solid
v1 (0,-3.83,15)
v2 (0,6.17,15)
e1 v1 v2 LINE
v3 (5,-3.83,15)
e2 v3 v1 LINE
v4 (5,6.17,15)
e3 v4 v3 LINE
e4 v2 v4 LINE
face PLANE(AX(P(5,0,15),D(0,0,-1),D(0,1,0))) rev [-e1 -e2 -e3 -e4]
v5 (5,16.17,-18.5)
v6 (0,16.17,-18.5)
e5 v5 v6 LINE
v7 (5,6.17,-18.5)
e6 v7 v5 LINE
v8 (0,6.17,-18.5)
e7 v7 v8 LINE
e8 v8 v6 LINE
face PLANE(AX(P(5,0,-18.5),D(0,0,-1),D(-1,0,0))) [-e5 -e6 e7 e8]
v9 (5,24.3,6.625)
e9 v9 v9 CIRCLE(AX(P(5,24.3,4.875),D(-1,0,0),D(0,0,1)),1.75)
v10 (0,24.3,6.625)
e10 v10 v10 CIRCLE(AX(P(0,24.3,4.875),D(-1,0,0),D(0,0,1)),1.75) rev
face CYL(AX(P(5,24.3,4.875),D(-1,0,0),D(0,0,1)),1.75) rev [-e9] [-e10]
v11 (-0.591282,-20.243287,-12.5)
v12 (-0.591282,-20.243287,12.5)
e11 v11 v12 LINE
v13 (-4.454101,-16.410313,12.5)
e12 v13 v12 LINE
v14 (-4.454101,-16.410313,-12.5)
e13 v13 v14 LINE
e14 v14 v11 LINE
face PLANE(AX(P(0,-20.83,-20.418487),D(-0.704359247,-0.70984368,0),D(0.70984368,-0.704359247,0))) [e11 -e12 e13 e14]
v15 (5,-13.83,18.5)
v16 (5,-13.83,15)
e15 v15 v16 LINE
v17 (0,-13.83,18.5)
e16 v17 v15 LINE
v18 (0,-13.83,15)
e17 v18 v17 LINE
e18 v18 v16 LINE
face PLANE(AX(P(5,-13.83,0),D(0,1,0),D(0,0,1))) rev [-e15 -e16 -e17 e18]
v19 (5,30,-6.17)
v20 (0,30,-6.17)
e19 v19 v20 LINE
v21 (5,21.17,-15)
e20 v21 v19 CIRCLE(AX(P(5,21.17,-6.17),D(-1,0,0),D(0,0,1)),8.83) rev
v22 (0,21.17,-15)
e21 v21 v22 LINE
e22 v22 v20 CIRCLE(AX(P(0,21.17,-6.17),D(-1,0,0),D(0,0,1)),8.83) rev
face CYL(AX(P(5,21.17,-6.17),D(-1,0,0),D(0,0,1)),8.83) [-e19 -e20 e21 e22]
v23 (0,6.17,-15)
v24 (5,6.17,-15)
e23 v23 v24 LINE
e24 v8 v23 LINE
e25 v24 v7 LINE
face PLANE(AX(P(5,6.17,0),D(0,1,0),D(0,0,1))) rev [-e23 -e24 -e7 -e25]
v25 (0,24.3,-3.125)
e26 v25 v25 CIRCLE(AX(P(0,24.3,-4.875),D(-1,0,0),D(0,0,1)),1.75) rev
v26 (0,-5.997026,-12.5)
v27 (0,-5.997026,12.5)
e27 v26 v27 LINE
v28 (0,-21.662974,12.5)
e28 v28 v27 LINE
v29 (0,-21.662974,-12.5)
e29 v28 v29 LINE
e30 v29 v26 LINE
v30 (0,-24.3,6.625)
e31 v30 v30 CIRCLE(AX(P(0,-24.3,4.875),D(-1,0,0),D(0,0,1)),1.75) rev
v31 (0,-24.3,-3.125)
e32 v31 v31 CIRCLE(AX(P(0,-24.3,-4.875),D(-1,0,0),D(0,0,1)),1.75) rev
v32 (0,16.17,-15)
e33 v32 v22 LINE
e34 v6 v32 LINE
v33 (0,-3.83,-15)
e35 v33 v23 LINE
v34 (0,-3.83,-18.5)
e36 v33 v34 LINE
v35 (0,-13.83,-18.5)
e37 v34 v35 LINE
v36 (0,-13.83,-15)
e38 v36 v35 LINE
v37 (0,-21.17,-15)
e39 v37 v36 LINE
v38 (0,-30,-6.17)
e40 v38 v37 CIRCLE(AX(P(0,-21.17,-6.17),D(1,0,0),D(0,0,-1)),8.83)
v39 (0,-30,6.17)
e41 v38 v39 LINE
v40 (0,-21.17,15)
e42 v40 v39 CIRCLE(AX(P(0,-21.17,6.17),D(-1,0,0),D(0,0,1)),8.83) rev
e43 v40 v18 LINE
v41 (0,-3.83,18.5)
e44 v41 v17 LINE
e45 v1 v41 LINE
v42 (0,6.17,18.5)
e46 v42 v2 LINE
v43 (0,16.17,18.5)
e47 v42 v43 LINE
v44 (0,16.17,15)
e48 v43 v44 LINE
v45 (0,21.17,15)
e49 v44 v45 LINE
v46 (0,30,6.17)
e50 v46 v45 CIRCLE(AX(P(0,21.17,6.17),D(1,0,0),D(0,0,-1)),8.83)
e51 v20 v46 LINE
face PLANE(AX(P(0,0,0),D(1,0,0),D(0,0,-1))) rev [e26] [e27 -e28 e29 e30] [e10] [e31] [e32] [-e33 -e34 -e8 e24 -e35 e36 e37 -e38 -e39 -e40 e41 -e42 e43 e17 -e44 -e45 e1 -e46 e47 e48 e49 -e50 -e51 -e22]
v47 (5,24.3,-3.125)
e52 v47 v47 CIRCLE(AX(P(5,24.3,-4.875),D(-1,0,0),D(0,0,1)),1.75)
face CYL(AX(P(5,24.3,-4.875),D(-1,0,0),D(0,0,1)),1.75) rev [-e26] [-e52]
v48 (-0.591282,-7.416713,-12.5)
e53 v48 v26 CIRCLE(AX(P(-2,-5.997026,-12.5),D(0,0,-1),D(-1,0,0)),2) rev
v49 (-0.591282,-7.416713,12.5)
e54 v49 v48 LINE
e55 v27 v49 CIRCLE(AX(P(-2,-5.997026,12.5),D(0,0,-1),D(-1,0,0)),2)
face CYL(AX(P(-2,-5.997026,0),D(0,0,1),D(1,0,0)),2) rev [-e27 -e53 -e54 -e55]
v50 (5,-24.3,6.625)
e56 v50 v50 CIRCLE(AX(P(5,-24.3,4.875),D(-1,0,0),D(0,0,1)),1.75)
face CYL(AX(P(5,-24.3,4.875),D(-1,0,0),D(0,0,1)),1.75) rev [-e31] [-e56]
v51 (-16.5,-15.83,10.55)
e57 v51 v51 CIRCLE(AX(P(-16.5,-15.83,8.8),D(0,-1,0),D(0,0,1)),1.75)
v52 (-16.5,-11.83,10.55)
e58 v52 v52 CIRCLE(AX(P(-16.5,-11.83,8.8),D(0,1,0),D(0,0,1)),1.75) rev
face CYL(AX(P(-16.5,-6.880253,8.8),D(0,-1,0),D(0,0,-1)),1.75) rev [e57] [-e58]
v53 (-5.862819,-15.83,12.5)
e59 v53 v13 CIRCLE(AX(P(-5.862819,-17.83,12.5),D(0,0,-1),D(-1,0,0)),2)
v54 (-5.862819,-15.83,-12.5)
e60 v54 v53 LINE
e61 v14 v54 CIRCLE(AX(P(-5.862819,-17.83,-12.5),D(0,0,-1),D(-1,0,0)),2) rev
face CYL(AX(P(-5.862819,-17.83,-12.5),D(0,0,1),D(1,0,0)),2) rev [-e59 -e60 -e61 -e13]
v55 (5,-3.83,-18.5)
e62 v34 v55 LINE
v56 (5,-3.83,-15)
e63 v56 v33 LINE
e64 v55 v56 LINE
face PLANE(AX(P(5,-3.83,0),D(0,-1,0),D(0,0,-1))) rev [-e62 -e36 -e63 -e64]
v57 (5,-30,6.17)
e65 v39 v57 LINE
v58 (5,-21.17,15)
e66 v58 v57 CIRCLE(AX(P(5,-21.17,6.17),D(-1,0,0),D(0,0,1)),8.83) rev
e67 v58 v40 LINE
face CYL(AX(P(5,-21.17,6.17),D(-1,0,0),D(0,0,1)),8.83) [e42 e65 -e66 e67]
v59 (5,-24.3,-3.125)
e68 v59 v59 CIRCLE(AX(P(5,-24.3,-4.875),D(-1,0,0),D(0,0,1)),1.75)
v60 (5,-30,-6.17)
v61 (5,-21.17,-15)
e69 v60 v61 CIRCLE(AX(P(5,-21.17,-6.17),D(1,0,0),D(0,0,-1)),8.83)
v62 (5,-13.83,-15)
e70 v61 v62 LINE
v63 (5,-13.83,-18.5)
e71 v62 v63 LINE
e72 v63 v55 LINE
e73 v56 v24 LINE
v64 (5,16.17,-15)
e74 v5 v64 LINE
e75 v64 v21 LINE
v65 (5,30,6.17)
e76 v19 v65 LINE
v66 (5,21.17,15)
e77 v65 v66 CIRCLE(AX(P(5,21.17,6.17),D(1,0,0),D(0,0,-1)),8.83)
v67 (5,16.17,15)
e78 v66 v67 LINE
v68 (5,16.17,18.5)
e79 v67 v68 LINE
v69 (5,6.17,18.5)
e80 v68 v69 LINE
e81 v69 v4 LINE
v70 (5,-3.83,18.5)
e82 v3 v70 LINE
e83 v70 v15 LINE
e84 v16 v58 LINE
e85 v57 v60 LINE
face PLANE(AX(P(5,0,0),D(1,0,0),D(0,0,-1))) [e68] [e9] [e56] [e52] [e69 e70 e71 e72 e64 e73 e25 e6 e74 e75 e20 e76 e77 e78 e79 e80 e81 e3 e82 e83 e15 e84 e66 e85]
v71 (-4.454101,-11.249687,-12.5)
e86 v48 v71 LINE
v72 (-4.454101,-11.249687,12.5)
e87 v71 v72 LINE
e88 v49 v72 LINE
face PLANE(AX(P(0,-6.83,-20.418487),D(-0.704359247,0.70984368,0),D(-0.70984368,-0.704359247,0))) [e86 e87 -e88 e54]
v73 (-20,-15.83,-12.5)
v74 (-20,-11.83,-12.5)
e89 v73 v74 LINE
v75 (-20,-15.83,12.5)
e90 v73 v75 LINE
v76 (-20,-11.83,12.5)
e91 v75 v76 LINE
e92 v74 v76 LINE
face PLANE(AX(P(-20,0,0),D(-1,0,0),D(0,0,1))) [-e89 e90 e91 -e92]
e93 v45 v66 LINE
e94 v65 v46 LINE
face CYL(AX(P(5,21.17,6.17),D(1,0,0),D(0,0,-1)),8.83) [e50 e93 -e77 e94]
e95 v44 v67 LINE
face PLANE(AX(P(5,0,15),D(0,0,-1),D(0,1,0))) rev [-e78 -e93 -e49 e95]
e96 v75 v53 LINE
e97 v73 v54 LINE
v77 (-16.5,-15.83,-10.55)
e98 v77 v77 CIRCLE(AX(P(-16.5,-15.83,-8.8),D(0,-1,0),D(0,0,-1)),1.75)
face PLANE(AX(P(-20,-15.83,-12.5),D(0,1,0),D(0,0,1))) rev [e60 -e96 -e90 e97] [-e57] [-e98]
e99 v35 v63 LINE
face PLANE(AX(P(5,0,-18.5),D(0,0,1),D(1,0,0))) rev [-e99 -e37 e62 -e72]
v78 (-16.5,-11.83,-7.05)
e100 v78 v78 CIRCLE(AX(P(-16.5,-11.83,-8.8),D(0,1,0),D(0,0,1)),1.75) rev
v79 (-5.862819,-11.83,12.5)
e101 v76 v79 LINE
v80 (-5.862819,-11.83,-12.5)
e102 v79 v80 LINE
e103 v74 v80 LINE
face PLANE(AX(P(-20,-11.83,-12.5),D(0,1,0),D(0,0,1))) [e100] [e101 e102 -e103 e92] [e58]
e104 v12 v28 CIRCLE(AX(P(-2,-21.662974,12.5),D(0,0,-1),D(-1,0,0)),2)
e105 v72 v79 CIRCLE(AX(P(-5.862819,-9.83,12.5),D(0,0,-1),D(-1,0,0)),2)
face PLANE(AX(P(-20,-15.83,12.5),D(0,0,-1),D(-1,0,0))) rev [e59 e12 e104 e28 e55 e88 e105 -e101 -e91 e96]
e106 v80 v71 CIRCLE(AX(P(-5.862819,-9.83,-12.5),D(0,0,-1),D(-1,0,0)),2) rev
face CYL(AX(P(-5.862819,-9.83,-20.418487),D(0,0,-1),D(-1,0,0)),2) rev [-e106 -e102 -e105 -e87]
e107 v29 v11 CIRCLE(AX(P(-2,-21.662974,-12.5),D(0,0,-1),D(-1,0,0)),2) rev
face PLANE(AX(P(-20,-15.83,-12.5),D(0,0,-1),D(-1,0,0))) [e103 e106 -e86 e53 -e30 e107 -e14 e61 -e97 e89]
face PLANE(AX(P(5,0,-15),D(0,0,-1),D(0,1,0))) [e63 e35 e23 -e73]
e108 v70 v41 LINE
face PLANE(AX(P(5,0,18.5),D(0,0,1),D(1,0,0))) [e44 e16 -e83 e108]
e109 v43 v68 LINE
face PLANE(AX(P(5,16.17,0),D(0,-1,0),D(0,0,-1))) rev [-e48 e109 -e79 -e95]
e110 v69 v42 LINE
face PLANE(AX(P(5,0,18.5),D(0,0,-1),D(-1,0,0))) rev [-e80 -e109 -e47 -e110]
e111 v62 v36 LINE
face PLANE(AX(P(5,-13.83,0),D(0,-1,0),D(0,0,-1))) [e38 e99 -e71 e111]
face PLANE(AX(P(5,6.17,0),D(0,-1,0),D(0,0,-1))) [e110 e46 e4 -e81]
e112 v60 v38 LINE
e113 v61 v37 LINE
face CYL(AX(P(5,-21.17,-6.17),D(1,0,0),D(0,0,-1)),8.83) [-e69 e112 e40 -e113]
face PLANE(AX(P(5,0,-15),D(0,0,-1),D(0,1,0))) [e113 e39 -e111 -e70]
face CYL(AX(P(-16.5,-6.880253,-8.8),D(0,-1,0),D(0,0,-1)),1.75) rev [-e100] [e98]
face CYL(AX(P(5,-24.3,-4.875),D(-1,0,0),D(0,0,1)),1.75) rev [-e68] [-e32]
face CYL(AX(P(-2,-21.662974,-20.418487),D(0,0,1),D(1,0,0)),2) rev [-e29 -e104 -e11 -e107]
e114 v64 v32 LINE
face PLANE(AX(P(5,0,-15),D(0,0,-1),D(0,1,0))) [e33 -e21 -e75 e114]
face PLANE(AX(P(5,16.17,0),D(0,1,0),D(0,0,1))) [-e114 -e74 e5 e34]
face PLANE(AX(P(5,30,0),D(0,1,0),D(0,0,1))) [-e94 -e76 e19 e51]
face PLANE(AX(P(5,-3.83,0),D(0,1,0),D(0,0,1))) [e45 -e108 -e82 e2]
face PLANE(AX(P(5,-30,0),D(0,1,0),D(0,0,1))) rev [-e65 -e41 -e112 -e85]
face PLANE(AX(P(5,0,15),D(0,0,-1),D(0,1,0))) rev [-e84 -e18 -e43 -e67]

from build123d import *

# Parameters (mm, degrees)
BOSS_EXTRUDE1_START     = -5
BOSS_EXTRUDE1_OUTLINE_R = 1.75
BOSS_EXTRUDE1_DEPTH     = 5
SKETCH3_W               = 25
SKETCH3_H               = 4
BOSS_EXTRUDE2_DEPTH     = 20
SKETCH4_R               = 1.75
CUT_EXTRUDE1_DEPTH      = 4
BOSS_EXTRUDE3_DEPTH     = 25
FILLET2_R               = 2


with BuildPart() as part:
    # Boss-Extrude1: read off the stored shape, not the designer's step
    # Boss-Extrude1 outline → Boss-Extrude1 (new body)
    with BuildSketch(Plane(origin=(5, 0, 0), x_dir=(0, 0, -1), z_dir=(1, 0, 0)).offset(BOSS_EXTRUDE1_START)):
        with BuildLine():
            Line((-6.17, -30), (6.17, -30))
            ThreePointArc((6.17, -30), (12.413752878, -27.413752878), (15, -21.17))
            Line((15, -21.17), (15, -13.83))
            Line((15, -13.83), (18.5, -13.83))
            Line((18.5, -13.83), (18.5, -3.83))
            Line((18.5, -3.83), (15, -3.83))
            Line((15, -3.83), (15, 6.17))
            Line((15, 6.17), (18.5, 6.17))
            Line((18.5, 6.17), (18.5, 16.17))
            Line((18.5, 16.17), (15, 16.17))
            Line((15, 16.17), (15, 21.17))
            ThreePointArc((15, 21.17), (12.413752878, 27.413752878), (6.17, 30))
            Line((6.17, 30), (-6.17, 30))
            ThreePointArc((-6.17, 30), (-12.413752878, 27.413752878), (-15, 21.17))
            Line((-15, 21.17), (-15, 16.17))
            Line((-15, 16.17), (-18.5, 16.17))
            Line((-18.5, 16.17), (-18.5, 6.17))
            Line((-18.5, 6.17), (-15, 6.17))
            Line((-15, 6.17), (-15, -3.83))
            Line((-15, -3.83), (-18.5, -3.83))
            Line((-18.5, -3.83), (-18.5, -13.83))
            Line((-18.5, -13.83), (-15, -13.83))
            Line((-15, -13.83), (-15, -21.17))
            ThreePointArc((-15, -21.17), (-12.413752878, -27.413752878), (-6.17, -30))
        make_face()
        with Locations((-4.875, -24.3)):
            Circle(BOSS_EXTRUDE1_OUTLINE_R, mode=Mode.SUBTRACT)
        with Locations((4.875, -24.3)):
            Circle(BOSS_EXTRUDE1_OUTLINE_R, mode=Mode.SUBTRACT)
        with Locations((-4.875, 24.3)):
            Circle(BOSS_EXTRUDE1_OUTLINE_R, mode=Mode.SUBTRACT)
        with Locations((4.875, 24.3)):
            Circle(BOSS_EXTRUDE1_OUTLINE_R, mode=Mode.SUBTRACT)
    extrude(amount=BOSS_EXTRUDE1_DEPTH)

    # Sketch3 → Boss-Extrude2 (add)
    with BuildSketch(Plane.ZY):
        with Locations((0, -13.83)):
            Rectangle(SKETCH3_W, SKETCH3_H)
    extrude(amount=BOSS_EXTRUDE2_DEPTH)

    # Sketch4 → Cut-Extrude1 (cut)
    with BuildSketch(Plane.XZ.offset(15.83)):
        with Locations(Location((-16.5, -8.8, 0), (0, 0, 270))):
            Circle(SKETCH4_R)
        with Locations(Location((-16.5, 8.8, 0), (0, 0, 90))):
            Circle(SKETCH4_R)
    extrude(amount=-CUT_EXTRUDE1_DEPTH, mode=Mode.SUBTRACT)

    # Sketch6 → Boss-Extrude3 (add)
    with BuildSketch(Plane.XY.offset(12.5)):
        Polygon((0, -11.83), (1.101299034, -11.83), (1.101299034, -6.83), (0, -6.83), (-5.038932071, -11.83), align=None)
        Polygon((-5.038932071, -15.83), (0, -15.83), (1.101299034, -15.83), (1.101299034, -20.83), (0, -20.83), align=None)
    extrude(amount=-BOSS_EXTRUDE3_DEPTH)

    # Fillet2
    fillet2_edges = [part.edges().sort_by_distance(p)[0] for p in [
        (0, -6.83, 0),
        (-5.038932071, -11.83, 0),
        (-5.038932071, -15.83, 0),
        (0, -20.83, 0),
    ]]
    fillet(fillet2_edges, radius=FILLET2_R)


solid = part.part
